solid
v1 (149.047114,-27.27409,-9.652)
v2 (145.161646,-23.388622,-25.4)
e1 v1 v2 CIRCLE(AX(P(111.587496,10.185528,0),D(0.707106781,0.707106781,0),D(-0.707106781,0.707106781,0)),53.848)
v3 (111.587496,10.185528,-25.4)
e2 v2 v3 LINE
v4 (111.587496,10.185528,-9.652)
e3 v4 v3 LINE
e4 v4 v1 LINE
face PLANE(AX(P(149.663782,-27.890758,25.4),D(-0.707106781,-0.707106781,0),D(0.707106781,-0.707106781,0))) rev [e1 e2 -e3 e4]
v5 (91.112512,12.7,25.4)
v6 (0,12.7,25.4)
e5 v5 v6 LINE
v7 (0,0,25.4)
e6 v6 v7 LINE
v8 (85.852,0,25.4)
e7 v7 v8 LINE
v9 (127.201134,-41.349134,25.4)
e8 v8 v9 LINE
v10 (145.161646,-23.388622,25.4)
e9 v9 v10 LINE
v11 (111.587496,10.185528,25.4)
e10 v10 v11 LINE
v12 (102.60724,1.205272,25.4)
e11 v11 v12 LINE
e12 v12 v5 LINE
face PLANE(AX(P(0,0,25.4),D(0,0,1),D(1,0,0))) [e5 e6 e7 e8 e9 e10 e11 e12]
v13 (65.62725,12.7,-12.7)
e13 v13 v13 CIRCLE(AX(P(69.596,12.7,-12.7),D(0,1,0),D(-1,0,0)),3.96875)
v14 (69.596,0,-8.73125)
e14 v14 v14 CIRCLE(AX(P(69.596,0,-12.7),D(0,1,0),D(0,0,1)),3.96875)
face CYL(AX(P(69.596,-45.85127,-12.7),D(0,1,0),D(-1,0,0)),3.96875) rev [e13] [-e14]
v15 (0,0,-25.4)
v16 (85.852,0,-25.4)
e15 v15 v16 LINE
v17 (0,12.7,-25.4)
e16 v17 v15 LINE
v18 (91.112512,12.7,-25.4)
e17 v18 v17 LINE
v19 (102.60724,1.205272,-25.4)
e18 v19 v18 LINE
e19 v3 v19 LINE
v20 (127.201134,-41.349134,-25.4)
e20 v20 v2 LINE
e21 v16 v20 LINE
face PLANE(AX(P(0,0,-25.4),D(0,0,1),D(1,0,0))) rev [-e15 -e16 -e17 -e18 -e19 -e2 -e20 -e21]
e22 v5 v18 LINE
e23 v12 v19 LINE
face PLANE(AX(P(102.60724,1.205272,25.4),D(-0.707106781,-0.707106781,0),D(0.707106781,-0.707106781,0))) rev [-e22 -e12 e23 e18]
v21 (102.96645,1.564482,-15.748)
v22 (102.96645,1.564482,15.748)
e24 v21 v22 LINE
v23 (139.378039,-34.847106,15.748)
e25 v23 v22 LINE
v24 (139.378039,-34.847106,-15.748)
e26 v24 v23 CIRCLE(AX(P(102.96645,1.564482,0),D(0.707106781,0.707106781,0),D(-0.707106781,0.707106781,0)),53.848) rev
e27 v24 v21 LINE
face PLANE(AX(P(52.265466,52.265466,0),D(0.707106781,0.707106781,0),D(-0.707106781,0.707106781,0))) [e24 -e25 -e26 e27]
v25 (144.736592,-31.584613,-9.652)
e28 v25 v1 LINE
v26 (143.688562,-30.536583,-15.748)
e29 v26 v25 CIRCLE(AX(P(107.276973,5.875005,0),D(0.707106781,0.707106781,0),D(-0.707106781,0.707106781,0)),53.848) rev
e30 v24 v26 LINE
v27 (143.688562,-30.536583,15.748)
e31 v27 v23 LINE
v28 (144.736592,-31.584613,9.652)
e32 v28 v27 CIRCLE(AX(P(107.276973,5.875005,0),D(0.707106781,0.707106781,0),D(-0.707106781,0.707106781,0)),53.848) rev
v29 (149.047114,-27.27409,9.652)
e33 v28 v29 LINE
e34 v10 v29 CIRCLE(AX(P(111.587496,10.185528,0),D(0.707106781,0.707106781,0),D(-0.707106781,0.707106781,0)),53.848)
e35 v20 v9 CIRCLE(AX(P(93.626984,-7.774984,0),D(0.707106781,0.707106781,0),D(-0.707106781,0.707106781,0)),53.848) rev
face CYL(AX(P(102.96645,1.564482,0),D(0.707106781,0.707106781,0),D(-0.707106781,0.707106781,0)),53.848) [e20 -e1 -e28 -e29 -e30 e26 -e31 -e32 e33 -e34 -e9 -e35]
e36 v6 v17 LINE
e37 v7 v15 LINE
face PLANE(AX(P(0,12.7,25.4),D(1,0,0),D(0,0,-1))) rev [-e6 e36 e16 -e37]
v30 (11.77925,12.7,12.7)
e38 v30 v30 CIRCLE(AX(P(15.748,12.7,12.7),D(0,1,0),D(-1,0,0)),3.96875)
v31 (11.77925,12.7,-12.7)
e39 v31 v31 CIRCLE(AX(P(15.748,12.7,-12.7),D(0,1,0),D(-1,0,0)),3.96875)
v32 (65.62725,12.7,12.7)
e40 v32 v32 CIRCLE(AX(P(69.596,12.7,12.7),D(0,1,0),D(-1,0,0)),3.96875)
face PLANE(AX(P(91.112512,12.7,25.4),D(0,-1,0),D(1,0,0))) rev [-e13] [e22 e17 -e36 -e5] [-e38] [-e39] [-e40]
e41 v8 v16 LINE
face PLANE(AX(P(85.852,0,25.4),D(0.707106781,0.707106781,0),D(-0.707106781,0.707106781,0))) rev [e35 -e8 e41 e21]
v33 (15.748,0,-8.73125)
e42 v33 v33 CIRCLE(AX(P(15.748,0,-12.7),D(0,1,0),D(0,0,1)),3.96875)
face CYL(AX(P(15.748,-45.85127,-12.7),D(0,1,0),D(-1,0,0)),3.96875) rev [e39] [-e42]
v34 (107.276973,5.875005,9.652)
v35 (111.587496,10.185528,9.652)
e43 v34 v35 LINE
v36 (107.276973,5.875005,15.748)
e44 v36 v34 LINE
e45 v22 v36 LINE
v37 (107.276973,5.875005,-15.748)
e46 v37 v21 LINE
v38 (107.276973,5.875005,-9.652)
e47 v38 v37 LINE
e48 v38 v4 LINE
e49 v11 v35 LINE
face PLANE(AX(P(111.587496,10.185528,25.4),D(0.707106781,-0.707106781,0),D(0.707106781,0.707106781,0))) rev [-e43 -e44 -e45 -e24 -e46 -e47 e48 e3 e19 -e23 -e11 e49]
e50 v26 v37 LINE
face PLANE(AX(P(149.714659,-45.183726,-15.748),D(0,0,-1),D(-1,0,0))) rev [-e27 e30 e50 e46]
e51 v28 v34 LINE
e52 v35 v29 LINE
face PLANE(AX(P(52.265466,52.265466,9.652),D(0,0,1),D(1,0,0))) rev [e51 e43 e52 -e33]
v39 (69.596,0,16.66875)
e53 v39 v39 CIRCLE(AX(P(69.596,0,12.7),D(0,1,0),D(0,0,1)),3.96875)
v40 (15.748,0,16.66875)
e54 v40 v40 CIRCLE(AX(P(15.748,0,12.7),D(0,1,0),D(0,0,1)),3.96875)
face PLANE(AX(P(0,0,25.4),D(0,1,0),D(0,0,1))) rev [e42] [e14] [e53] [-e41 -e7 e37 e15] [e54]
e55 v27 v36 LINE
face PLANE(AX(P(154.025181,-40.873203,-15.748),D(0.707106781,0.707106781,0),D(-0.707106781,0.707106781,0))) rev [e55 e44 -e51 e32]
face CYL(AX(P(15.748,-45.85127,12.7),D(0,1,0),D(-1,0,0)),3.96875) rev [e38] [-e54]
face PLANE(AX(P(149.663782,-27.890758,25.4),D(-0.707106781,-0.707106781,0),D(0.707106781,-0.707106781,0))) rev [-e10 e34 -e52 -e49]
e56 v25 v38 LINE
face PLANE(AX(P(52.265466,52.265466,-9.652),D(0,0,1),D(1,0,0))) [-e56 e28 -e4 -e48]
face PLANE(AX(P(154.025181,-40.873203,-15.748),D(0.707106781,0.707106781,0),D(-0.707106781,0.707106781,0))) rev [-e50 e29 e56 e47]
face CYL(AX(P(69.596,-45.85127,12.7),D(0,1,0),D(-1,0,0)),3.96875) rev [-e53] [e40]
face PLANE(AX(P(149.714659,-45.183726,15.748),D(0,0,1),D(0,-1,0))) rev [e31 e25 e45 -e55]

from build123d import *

# Parameters (mm, degrees)
BOSS_EXTRUDE1_DEPTH = 25.4
CUT_EXTRUDE2_DEPTH  = 12.192
CUT_EXTRUDE3_DEPTH  = 141.749443769
SKETCH3_W           = 31.496
SKETCH3_H           = 6.096
CUT_EXTRUDE4_DEPTH  = 120.736402781
SKETCH4_R           = 3.96875
CUT_EXTRUDE5_DEPTH  = 163.137144219


with BuildPart() as part:
    # Sketch1 → Boss-Extrude1 (new, symmetric)
    with BuildSketch(Plane.XY):
        Polygon((0, 0), (85.852, 0), (131.703269909, -45.851269909), (149.663782152, -27.890757667), (111.587496198, 10.185528286), (102.607240077, 1.205272165), (91.112512242, 12.7), (0, 12.7), align=None)
    extrude(amount=BOSS_EXTRUDE1_DEPTH, both=True)

    # Sketch2 → Cut-Extrude2 (cut)
    with BuildSketch(Plane(origin=(60.886512242, 60.886512242, 0), x_dir=(0, 0, -1), z_dir=(0.707106781186544, 0.7071067811865511, 0))):
        with BuildLine():
            Line((-25.4, -119.183037491), (-25.4, -125.550019136))
            Line((-25.4, -125.550019136), (25.4, -125.550019136))
            Line((25.4, -125.550019136), (25.4, -119.183037491))
            ThreePointArc((25.4, -119.183037491), (17.740042491, -122.543911277), (9.652, -124.677919317))
            Line((9.652, -124.677919317), (9.652, -71.702019136))
            Line((9.652, -71.702019136), (-9.652, -71.702019136))
            Line((-9.652, -71.702019136), (-9.652, -124.677919317))
            ThreePointArc((-9.652, -124.677919317), (-17.740042491, -122.543911277), (-25.4, -119.183037491))
        make_face()
    extrude(amount=-CUT_EXTRUDE2_DEPTH, mode=Mode.SUBTRACT)

    # Sketch2<5> → Cut-Extrude3 (cut, through all)
    with BuildSketch(Plane(origin=(60.886512242, 60.886512242, 0), x_dir=(0, 0, -1), z_dir=(0.707106781186544, 0.7071067811865511, 0))):
        with BuildLine():
            Line((-25.4, -119.183037491), (-25.4, -125.550019136))
            Line((-25.4, -125.550019136), (0, -125.550019136))
            ThreePointArc((0, -125.550019136), (-13.09292228, -123.934025513), (-25.4, -119.183037491))
        make_face()
        with BuildLine():
            Line((0, -125.550019136), (25.4, -125.550019136))
            Line((25.4, -125.550019136), (25.4, -119.183037491))
            ThreePointArc((25.4, -119.183037491), (13.09292228, -123.934025513), (0, -125.550019136))
        make_face()
    extrude(amount=-CUT_EXTRUDE3_DEPTH, mode=Mode.SUBTRACT)

    # Sketch3 → Cut-Extrude4 (cut, through all)
    with BuildSketch(Plane(origin=(50.700983956, -50.700983956, 0), x_dir=(0, 0, 1), z_dir=(-0.7071067811865549, 0.7071067811865401, 0))):
        with Locations((0, 76.962531378)):
            Rectangle(SKETCH3_W, SKETCH3_H)
    extrude(amount=-CUT_EXTRUDE4_DEPTH, mode=Mode.SUBTRACT)

    # Sketch4 → Cut-Extrude5 (cut, through all)
    with BuildSketch(Plane(origin=(0, 12.7, 0), x_dir=(1, 0, 0), z_dir=(0, 1, 0))):
        with Locations((15.748, 12.7)):
            Circle(SKETCH4_R)
        with Locations((69.596, 12.7)):
            Circle(SKETCH4_R)
        with Locations((15.748, -12.7)):
            Circle(SKETCH4_R)
        with Locations((69.596, -12.7)):
            Circle(SKETCH4_R)
    extrude(amount=-CUT_EXTRUDE5_DEPTH, mode=Mode.SUBTRACT)


solid = part.part
